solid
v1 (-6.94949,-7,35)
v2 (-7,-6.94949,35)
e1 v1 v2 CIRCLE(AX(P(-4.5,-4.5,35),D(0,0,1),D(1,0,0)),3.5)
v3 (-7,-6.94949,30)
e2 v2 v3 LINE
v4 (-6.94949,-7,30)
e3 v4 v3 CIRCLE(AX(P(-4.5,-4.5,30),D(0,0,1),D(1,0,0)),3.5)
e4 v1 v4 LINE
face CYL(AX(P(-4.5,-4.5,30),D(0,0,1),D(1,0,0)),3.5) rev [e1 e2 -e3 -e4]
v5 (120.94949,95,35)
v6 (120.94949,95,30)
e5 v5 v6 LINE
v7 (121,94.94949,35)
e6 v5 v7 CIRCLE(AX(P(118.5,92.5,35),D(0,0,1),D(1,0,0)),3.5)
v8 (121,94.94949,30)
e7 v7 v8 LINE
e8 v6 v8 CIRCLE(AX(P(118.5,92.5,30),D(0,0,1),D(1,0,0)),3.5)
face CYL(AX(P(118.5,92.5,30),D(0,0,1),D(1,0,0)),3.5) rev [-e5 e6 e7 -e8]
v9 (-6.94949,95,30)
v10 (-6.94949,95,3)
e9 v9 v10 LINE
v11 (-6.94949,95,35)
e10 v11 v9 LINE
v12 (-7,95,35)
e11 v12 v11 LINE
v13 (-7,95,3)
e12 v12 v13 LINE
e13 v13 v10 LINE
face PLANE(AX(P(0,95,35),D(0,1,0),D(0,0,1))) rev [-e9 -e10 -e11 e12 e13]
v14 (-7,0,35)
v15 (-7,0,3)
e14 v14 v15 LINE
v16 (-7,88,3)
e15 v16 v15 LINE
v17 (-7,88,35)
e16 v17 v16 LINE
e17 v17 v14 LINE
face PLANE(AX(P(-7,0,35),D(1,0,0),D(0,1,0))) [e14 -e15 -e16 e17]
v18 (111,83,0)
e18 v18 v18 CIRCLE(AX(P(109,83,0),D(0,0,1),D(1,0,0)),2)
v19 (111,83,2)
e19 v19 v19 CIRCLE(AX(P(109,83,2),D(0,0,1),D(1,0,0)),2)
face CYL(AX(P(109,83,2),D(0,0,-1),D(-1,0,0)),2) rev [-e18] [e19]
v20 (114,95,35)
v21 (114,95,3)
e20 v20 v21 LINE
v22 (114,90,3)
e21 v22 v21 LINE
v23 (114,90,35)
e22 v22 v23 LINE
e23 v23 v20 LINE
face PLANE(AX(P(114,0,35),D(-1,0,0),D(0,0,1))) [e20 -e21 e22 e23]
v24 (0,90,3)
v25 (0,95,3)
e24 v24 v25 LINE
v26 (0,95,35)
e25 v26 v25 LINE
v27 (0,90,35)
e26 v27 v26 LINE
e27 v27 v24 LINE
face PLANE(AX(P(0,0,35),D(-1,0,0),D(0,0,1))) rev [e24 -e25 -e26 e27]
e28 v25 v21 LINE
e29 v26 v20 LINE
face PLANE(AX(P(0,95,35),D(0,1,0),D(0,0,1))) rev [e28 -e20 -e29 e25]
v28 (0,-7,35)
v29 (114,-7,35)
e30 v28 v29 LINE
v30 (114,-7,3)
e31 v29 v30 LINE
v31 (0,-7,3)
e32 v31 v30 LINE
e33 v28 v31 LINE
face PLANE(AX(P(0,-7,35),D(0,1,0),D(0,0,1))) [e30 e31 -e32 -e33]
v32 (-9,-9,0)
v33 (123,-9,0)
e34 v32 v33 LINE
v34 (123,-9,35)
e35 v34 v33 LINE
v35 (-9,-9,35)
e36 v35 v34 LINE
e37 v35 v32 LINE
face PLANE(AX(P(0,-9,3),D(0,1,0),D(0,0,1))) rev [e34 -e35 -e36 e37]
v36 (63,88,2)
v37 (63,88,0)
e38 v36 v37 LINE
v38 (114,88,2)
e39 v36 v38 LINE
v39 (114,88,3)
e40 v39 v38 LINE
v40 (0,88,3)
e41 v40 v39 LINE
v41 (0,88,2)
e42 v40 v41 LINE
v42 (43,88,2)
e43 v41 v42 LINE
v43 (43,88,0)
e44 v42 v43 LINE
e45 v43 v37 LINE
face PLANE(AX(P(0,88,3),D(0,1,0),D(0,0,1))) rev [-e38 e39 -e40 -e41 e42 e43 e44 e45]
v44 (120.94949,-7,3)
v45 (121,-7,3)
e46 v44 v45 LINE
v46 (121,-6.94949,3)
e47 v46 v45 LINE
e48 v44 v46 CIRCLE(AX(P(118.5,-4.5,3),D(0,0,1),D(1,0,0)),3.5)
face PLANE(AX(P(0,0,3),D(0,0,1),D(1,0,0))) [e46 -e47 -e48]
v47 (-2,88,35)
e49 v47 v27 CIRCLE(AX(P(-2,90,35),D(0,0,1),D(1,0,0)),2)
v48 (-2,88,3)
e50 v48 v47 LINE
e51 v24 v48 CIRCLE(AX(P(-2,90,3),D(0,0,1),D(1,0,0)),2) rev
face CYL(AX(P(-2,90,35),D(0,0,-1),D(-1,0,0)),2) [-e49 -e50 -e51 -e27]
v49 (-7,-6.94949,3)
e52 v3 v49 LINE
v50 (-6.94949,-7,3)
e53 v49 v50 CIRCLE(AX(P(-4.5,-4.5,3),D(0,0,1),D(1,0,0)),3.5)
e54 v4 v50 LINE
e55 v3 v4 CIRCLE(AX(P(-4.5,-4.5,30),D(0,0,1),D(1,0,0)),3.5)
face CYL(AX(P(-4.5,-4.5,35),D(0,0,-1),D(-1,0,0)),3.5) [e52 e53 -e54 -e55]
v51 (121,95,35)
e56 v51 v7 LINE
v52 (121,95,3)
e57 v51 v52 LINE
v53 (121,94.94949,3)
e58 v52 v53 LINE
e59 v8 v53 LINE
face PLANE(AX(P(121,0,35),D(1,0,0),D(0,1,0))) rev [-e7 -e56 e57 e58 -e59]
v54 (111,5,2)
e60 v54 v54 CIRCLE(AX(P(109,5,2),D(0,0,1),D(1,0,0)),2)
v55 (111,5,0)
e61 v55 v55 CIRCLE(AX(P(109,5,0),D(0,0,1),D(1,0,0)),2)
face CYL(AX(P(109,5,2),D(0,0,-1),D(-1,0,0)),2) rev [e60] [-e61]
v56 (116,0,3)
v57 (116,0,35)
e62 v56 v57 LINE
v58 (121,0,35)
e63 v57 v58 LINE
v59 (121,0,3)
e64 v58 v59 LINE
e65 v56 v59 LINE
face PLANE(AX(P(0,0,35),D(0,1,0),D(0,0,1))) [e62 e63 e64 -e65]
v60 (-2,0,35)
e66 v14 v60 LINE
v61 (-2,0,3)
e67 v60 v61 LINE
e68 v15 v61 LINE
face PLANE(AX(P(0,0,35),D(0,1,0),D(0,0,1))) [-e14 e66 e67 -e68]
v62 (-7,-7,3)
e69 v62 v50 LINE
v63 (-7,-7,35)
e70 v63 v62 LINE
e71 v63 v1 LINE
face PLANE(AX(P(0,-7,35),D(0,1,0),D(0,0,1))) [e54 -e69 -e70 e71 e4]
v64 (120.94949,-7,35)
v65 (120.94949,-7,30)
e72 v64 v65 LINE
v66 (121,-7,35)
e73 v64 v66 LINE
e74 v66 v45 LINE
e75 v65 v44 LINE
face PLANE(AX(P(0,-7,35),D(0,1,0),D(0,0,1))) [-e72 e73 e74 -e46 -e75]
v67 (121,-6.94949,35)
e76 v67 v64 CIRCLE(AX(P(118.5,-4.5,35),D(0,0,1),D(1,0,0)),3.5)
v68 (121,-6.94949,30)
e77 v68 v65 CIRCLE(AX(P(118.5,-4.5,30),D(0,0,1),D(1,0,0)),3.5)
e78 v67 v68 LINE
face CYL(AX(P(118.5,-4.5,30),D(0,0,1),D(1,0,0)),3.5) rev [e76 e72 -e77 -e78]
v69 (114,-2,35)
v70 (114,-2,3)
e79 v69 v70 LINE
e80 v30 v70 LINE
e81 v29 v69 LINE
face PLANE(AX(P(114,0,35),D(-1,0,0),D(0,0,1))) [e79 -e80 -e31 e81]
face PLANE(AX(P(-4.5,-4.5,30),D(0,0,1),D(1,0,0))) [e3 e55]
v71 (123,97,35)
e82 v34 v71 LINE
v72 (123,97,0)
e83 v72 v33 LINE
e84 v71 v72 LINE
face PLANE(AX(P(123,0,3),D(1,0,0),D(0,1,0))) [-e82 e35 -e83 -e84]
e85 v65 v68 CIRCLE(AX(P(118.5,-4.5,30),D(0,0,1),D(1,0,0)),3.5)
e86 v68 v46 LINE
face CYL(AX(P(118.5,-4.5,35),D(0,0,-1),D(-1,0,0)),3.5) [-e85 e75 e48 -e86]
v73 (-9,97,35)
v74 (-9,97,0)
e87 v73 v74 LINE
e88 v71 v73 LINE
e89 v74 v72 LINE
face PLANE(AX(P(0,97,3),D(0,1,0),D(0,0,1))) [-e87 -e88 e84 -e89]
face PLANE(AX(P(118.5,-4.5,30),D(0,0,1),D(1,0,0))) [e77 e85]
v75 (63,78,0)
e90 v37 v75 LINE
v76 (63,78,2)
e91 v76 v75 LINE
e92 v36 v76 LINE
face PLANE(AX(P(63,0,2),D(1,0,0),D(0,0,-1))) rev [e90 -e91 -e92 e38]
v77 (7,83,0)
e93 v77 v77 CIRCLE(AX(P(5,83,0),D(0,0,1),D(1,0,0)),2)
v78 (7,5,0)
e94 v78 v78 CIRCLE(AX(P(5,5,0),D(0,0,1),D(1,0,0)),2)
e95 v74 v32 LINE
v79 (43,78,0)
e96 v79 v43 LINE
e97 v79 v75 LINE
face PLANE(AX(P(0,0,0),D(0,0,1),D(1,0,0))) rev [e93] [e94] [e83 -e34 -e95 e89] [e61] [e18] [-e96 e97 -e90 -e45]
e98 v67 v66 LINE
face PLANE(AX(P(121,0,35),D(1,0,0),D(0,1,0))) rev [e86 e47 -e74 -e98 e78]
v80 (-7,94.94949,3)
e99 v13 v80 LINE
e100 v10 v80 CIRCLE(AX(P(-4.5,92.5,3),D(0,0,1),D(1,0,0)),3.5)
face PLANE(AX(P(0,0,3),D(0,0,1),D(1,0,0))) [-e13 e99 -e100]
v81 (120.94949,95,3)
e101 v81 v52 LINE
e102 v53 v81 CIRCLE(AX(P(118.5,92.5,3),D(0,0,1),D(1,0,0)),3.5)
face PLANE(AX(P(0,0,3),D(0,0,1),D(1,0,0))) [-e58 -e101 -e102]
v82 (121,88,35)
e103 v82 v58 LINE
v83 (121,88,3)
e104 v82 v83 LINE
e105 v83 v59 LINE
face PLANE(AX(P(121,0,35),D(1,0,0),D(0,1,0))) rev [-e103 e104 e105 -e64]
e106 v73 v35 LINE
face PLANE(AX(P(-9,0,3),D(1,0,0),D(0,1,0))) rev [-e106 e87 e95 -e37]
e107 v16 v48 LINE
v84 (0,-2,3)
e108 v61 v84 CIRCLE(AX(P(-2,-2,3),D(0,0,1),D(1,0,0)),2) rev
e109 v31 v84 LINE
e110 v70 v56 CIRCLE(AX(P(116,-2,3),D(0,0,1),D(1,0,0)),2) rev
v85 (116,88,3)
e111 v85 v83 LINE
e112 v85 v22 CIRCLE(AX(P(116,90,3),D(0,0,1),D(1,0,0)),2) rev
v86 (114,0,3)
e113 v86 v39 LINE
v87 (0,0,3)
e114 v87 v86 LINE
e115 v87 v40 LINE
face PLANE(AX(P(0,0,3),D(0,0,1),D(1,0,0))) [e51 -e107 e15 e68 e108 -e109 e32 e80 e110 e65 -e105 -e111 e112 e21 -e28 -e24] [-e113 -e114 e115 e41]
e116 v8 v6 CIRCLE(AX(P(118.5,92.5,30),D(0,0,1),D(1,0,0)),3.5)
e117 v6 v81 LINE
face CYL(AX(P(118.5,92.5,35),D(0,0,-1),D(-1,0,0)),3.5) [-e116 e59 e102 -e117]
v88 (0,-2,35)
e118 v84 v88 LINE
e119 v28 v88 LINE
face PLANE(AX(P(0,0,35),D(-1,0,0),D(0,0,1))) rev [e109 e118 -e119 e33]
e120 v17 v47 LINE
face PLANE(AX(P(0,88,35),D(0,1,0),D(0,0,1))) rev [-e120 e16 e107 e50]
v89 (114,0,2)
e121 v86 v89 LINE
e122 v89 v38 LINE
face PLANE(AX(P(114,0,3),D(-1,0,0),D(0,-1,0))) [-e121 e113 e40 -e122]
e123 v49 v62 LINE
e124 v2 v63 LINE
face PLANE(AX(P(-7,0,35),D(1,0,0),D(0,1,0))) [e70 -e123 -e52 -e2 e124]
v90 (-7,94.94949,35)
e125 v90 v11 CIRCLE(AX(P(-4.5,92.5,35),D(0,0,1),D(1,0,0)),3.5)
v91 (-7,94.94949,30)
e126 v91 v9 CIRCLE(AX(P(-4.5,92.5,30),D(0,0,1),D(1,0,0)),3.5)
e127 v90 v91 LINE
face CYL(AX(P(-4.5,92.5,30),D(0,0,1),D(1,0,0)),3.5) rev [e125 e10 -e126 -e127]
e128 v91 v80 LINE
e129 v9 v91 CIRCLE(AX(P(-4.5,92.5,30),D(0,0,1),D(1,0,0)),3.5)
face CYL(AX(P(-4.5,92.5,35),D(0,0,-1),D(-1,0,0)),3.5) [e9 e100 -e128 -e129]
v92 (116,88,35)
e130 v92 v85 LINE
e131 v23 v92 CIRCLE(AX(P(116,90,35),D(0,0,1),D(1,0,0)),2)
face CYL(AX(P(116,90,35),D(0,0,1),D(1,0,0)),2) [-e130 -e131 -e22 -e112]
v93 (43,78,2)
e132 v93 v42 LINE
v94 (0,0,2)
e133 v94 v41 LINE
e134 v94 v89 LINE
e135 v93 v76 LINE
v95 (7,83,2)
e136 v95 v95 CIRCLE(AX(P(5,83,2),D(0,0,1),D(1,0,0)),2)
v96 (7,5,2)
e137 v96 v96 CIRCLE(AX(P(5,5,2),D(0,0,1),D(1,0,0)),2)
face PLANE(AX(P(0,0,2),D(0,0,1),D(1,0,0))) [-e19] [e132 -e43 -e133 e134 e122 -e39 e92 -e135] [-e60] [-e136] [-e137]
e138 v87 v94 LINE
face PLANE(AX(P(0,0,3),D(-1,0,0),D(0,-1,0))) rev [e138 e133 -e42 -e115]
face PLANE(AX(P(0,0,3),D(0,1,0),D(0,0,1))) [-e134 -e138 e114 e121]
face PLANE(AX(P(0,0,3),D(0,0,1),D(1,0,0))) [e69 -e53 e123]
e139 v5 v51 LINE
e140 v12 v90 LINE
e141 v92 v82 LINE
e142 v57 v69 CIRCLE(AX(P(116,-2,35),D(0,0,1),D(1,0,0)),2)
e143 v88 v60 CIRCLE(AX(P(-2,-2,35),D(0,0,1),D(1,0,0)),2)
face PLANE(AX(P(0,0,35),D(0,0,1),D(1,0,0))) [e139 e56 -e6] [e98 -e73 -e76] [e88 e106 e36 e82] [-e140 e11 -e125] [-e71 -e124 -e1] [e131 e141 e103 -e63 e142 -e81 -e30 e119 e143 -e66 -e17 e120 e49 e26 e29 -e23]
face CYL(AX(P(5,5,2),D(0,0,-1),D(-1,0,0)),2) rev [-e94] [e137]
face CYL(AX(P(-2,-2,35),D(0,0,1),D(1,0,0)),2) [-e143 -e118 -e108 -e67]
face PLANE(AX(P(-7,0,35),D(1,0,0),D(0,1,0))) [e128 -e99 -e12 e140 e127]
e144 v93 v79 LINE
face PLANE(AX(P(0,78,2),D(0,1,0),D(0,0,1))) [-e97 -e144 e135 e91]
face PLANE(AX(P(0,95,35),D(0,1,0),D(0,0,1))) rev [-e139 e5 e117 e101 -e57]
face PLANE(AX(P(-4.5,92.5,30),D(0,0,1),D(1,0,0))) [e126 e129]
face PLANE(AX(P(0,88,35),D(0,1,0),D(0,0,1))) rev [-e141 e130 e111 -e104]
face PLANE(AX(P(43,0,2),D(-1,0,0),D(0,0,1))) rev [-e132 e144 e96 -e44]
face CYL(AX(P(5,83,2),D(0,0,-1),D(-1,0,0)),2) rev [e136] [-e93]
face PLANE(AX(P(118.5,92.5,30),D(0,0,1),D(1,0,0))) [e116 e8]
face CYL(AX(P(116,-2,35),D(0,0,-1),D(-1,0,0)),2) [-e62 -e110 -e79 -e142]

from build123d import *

# Parameters (mm, degrees)
ESQUISSE1_R             = 2
BOSS_EXTRU_1_DEPTH      = 2
ESQUISSE1_3_W           = 132
ESQUISSE1_3_H           = 106
ESQUISSE1_3_W_2         = 114
ESQUISSE1_3_H_2         = 88
BOSS_EXTRU_2_DEPTH      = 3
ESQUISSE2_W             = 132
ESQUISSE2_H             = 106
BOSS_EXTRU_4_DEPTH      = 32
ENL_V_START             = -5
ESQUISSE3_R             = 3.5
ENL_V_MAT_EXTRU_1_DEPTH = 5
CONG_1_R                = 2


with BuildPart() as part:
    # Esquisse1 → Boss.-Extru.1 (new body)
    with BuildSketch(Plane.XY):
        Polygon((63, 78), (43, 78), (43, 84.300950417), (43, 88), (0, 88), (0, 0), (114, 0), (114, 88), (63, 88), (63, 84.300950417), align=None)
        with Locations((5, 5)):
            Circle(ESQUISSE1_R, mode=Mode.SUBTRACT)
        with Locations((109, 5)):
            Circle(ESQUISSE1_R, mode=Mode.SUBTRACT)
        with Locations((5, 83)):
            Circle(ESQUISSE1_R, mode=Mode.SUBTRACT)
        with Locations((109, 83)):
            Circle(ESQUISSE1_R, mode=Mode.SUBTRACT)
    extrude(amount=BOSS_EXTRU_1_DEPTH)

    # Esquisse1<3> → Boss.-Extru.2 (add)
    with BuildSketch(Plane.XY):
        with Locations((57, 44)):
            Rectangle(ESQUISSE1_3_W, ESQUISSE1_3_H)
        with Locations((57, 44)):
            Rectangle(ESQUISSE1_3_W_2, ESQUISSE1_3_H_2, mode=Mode.SUBTRACT)
    extrude(amount=BOSS_EXTRU_2_DEPTH)

    # Esquisse2 → Boss.-Extru.4 (add)
    with BuildSketch(Plane.XY.offset(3)):
        with Locations((57, 44)):
            Rectangle(ESQUISSE2_W, ESQUISSE2_H)
        with BuildLine():
            Line((-7, -7), (-7, -6.949489743))
            ThreePointArc((-7, -6.949489743), (-6.974873734, -6.974873734), (-6.949489743, -7))
            Line((-6.949489743, -7), (-7, -7))
        make_face(mode=Mode.SUBTRACT)
        Polygon((114, -7), (0, -7), (0, 0), (-7, 0), (-7, 88), (0, 88), (0, 95), (114, 95), (114, 88), (121, 88), (121, 0), (114, 0), align=None, mode=Mode.SUBTRACT)
        with BuildLine():
            ThreePointArc((120.949489743, -7), (120.974873734, -6.974873734), (121, -6.949489743))
            Line((121, -6.949489743), (121, -7))
            Line((121, -7), (120.949489743, -7))
        make_face(mode=Mode.SUBTRACT)
        with BuildLine():
            Line((-7, 95), (-6.949489743, 95))
            ThreePointArc((-6.949489743, 95), (-6.974873734, 94.974873734), (-7, 94.949489743))
            Line((-7, 94.949489743), (-7, 95))
        make_face(mode=Mode.SUBTRACT)
        with BuildLine():
            ThreePointArc((121, 94.949489743), (120.974873734, 94.974873734), (120.949489743, 95))
            Line((120.949489743, 95), (121, 95))
            Line((121, 95), (121, 94.949489743))
        make_face(mode=Mode.SUBTRACT)
    extrude(amount=BOSS_EXTRU_4_DEPTH)

    # Esquisse3 → Enlèv. mat.-Extru.1 (cut)
    with BuildSketch(Plane.XY.offset(35).offset(ENL_V_START)):
        with Locations((-4.5, 92.5)):
            Circle(ESQUISSE3_R)
        with Locations((118.5, 92.5)):
            Circle(ESQUISSE3_R)
        with Locations((118.5, -4.5)):
            Circle(ESQUISSE3_R)
        with Locations((-4.5, -4.5)):
            Circle(ESQUISSE3_R)
    extrude(amount=ENL_V_MAT_EXTRU_1_DEPTH, mode=Mode.SUBTRACT)

    # Congé1
    # the kernel refuses this fillet: 2 mm, written as the material it takes off along each edge
    with BuildSketch(Plane(origin=(114, 88, 3), x_dir=(0, 1, 0), z_dir=(0, 0, 1)), Plane(origin=(114, 0, 3), x_dir=(1, 0, 0), z_dir=(0, 0, 1))) as cong_1_piece_1:
        with BuildLine():
            CenterArc((CONG_1_R, -CONG_1_R), CONG_1_R, 90, 90)
            Line((0, -CONG_1_R), (0, 0))
            Line((0, 0), (CONG_1_R, 0))
        make_face()
    extrude(amount=37, mode=Mode.SUBTRACT)
    with BuildSketch(Plane(origin=(0, 0, 3), x_dir=(-1, 0, 0), z_dir=(0, 0, 1)), Plane(origin=(0, 88, 3), x_dir=(0, 1, 0), z_dir=(0, 0, 1))) as cong_1_piece_2:
        with BuildLine():
            CenterArc((CONG_1_R, CONG_1_R), CONG_1_R, 180, 90)
            Line((0, CONG_1_R), (0, 0))
            Line((0, 0), (CONG_1_R, 0))
        make_face()
    extrude(amount=37, mode=Mode.SUBTRACT)


solid = part.part
